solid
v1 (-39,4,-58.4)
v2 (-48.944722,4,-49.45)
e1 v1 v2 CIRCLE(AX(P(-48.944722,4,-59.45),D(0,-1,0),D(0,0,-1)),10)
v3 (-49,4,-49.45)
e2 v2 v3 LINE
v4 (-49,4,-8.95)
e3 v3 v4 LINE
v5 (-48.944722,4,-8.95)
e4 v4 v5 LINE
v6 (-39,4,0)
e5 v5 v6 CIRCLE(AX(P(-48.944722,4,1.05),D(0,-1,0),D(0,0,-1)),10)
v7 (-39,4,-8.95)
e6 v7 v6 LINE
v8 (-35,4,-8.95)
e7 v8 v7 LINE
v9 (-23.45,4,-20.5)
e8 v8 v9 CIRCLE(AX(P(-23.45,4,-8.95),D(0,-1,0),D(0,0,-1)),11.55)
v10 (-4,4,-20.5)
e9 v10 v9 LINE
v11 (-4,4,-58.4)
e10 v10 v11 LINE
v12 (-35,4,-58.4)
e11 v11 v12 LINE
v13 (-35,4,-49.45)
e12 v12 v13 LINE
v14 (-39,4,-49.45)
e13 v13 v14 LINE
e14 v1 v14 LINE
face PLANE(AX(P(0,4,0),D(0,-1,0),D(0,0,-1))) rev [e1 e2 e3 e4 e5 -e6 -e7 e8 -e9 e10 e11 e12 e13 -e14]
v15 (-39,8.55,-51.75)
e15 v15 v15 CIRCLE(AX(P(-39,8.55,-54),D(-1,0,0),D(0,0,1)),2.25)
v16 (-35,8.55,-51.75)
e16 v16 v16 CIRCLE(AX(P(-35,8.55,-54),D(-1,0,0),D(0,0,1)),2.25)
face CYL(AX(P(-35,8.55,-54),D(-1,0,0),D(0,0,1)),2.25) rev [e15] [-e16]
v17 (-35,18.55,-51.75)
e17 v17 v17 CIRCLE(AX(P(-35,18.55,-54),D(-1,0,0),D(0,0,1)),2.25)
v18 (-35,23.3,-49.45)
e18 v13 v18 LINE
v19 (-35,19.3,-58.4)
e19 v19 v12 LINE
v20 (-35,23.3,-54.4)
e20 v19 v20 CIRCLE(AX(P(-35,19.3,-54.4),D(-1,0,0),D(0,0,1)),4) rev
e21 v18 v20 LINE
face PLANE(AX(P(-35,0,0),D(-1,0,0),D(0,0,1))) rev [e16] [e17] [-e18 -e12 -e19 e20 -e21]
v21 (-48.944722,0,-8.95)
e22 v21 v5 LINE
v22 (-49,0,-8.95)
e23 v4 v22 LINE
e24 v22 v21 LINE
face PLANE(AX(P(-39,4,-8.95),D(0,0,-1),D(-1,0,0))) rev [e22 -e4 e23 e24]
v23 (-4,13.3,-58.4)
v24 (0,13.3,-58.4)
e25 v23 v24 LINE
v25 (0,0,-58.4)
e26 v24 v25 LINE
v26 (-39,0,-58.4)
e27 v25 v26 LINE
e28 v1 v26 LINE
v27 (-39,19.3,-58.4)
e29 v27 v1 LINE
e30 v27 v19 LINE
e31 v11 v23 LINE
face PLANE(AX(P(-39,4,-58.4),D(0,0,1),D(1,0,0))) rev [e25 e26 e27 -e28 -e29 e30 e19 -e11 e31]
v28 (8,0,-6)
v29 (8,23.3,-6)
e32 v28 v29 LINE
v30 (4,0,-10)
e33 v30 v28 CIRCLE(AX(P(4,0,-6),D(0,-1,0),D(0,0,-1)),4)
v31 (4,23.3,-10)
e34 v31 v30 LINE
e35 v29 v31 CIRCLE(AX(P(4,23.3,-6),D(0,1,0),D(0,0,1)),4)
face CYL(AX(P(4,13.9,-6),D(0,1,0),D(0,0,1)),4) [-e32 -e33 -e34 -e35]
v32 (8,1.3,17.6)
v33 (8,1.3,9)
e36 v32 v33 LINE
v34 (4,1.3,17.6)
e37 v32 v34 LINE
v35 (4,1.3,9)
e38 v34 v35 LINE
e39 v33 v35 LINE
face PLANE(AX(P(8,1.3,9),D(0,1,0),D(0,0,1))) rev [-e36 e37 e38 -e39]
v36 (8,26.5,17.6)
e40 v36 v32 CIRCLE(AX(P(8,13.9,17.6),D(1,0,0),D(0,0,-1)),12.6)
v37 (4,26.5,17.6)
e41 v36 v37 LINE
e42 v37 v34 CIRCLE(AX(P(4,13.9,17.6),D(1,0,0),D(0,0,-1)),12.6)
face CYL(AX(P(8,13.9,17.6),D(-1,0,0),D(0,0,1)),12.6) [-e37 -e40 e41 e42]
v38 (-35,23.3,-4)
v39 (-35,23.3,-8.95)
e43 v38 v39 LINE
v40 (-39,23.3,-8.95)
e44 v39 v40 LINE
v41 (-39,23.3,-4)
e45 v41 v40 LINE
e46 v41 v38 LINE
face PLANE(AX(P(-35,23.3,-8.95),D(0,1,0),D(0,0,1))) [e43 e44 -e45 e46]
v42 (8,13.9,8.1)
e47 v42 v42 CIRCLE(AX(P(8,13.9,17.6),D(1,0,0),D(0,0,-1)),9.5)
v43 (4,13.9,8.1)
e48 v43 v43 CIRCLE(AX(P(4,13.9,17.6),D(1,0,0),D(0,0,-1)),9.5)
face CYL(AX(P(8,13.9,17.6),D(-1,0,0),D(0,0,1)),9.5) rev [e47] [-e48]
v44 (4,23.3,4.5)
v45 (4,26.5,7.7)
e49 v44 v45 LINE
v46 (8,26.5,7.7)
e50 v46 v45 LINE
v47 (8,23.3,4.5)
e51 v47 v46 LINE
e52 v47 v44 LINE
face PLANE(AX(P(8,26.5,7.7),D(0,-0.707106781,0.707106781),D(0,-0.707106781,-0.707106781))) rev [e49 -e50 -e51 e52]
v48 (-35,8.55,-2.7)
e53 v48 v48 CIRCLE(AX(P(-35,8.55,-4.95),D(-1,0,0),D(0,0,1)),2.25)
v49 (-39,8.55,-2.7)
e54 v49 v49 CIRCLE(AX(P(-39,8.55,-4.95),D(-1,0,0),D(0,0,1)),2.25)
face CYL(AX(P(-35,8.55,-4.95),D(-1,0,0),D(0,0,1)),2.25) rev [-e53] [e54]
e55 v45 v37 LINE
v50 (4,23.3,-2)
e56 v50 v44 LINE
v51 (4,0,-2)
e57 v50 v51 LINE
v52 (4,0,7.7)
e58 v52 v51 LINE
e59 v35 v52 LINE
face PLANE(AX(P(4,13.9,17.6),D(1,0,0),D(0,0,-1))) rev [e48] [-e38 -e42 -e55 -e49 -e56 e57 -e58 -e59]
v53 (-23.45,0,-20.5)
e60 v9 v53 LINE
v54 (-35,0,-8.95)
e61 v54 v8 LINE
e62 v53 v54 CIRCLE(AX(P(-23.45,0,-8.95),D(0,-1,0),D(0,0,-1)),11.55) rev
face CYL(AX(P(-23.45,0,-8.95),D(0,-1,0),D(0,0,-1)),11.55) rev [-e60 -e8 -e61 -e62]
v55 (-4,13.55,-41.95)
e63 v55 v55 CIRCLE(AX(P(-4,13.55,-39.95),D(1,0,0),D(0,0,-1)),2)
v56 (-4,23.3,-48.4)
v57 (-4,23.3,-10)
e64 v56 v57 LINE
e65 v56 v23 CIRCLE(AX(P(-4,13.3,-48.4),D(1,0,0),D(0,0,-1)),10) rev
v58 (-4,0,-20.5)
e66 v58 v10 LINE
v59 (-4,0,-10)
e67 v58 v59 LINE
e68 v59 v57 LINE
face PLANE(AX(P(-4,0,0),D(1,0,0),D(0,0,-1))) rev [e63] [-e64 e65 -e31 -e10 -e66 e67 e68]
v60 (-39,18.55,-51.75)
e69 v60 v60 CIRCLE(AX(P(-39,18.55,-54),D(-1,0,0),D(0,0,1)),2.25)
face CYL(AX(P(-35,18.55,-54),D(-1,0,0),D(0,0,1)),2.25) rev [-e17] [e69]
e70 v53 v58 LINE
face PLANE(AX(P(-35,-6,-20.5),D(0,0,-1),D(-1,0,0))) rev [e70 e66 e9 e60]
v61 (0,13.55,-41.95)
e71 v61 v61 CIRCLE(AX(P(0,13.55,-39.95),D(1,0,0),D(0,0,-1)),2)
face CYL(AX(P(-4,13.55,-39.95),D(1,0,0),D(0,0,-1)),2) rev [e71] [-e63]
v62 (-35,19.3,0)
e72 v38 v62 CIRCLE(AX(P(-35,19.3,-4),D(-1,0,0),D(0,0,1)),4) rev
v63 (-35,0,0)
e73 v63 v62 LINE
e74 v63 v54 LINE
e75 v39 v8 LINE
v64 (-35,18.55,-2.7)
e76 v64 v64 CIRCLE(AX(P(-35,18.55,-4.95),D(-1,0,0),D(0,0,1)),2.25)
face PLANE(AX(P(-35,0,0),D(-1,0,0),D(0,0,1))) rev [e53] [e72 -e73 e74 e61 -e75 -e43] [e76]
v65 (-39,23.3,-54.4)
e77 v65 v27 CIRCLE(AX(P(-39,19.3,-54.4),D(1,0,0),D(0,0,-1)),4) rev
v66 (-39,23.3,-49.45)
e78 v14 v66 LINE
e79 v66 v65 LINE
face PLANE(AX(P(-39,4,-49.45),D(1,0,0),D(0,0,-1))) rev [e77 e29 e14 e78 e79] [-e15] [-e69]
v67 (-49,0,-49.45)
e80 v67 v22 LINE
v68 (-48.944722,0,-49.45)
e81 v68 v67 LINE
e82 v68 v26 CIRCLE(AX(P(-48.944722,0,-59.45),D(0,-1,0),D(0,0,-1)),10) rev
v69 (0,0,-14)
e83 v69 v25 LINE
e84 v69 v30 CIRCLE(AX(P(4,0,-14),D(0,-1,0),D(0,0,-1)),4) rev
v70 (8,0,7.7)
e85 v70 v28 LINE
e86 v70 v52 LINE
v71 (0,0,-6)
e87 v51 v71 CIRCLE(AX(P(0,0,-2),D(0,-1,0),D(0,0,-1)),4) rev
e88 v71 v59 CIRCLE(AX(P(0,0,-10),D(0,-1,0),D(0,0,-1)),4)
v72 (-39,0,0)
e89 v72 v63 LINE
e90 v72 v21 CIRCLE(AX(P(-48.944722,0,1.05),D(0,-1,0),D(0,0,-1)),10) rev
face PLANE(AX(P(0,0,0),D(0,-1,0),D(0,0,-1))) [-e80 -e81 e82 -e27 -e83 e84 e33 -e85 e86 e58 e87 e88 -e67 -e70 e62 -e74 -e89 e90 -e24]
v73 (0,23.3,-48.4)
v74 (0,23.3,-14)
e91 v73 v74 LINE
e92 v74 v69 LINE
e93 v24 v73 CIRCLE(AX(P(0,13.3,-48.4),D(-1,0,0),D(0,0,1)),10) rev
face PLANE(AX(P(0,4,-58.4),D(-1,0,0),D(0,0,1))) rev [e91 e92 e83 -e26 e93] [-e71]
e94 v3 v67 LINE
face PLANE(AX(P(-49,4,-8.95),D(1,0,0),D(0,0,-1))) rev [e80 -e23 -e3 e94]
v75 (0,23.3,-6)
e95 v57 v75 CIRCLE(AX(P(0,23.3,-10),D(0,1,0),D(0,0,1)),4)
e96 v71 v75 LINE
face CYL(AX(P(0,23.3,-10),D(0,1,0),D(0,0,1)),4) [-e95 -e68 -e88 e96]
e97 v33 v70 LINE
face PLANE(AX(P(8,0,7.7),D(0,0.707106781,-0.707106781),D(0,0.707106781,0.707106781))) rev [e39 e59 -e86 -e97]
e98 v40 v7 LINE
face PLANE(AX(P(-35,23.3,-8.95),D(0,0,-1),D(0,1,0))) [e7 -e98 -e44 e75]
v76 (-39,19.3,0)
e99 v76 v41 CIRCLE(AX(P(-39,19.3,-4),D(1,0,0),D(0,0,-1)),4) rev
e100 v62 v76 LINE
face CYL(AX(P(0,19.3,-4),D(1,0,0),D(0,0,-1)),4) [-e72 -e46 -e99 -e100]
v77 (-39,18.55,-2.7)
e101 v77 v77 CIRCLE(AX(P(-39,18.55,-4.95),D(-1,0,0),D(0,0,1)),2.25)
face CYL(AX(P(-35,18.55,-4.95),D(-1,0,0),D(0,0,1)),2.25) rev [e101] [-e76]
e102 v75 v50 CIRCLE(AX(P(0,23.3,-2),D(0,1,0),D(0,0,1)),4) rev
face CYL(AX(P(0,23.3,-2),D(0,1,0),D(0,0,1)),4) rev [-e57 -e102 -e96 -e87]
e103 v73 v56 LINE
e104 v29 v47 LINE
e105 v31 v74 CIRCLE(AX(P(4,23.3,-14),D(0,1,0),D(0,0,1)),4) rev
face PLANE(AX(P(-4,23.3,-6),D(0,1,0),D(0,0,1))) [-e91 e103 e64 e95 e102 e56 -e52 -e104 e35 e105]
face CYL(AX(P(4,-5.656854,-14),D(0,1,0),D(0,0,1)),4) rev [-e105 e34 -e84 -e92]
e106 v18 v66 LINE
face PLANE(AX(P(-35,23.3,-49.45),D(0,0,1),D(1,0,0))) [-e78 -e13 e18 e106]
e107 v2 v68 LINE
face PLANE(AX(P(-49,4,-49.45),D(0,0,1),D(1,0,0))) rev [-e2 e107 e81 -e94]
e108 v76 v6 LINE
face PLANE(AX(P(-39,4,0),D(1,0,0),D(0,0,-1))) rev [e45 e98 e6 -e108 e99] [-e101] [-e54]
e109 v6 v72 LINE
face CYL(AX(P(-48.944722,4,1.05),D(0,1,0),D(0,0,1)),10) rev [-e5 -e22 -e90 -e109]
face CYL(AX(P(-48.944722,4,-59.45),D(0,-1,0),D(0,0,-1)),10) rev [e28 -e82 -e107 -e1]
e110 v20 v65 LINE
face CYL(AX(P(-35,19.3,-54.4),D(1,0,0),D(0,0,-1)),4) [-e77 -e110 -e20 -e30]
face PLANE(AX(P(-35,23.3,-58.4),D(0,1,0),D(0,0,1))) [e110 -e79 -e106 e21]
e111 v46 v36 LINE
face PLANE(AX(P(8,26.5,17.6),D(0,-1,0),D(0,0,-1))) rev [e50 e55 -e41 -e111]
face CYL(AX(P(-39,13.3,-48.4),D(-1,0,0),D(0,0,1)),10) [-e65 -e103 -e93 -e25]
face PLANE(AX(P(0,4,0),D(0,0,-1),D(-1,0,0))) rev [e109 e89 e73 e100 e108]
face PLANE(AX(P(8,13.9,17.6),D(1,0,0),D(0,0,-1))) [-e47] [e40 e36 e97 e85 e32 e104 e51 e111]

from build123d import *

# Parameters (mm, degrees)
BOSS_EXTRUDE1_DEPTH = 4
SKETCH2_W           = 8.95
SKETCH2_H           = 19.3
SKETCH2_R           = 2.25
BOSS_EXTRUDE2_DEPTH = 4
FILLET1_R           = 10
FILLET2_R           = 4
SKETCH3_W           = 52.4
SKETCH3_H           = 19.3
SKETCH3_R           = 2
BOSS_EXTRUDE3_DEPTH = 4
FILLET3_R           = 10
SKETCH4_W           = 31
SKETCH4_H           = 20.5
CUT_EXTRUDE1_DEPTH  = 10
SKETCH5_W           = 4
SKETCH5_H           = 6
CUT_EXTRUDE2_DEPTH  = 10
FILLET4_R           = 11.55
SKETCH6_W           = 4
SKETCH6_H           = 4
BOSS_EXTRUDE4_DEPTH = 23.3
SKETCH7_R           = 9.5
BOSS_EXTRUDE5_DEPTH = 4
FILLET5_R           = 4


# Some blends are built 0.0001 mm under size
with BuildPart() as part:
    # Sketch1 → Boss-Extrude1 (new body)
    with BuildSketch(Plane(origin=(0, 0, 0), x_dir=(1, 0, 0), z_dir=(0, 1, 0))):
        Polygon((-49, 49.45), (-39, 49.45), (-39, 58.4), (0, 58.4), (0, 0), (-39, 0), (-39, 8.95), (-49, 8.95), align=None)
    extrude(amount=BOSS_EXTRUDE1_DEPTH)

    # Sketch2 → Boss-Extrude2 (add)
    # profile 1 of 2: a face of its own
    with BuildSketch(Plane.ZY.offset(39)):
        with Locations((-4.475, 13.65)):
            Rectangle(SKETCH2_W, SKETCH2_H)
        with Locations((-4.95, 18.55)):
            Circle(SKETCH2_R, mode=Mode.SUBTRACT)
        with Locations((-4.95, 8.55)):
            Circle(SKETCH2_R, mode=Mode.SUBTRACT)
    # profile 2 of 2: a face of its own
    with BuildSketch(Plane.ZY.offset(39)):
        with Locations((-53.925, 13.65)):
            Rectangle(SKETCH2_W, SKETCH2_H)
        with Locations((-54, 18.55)):
            Circle(SKETCH2_R, mode=Mode.SUBTRACT)
        with Locations((-54, 8.55)):
            Circle(SKETCH2_R, mode=Mode.SUBTRACT)
    extrude(amount=-BOSS_EXTRUDE2_DEPTH)

    # Fillet1
    # the kernel refuses this fillet: 10 mm, written as the material it adds along each edge
    with BuildSketch(Plane(origin=(-39, 0, -49.45), x_dir=(-1, 0, 0), z_dir=(0, 1, 0))) as fillet1_piece_1:
        with BuildLine():
            CenterArc((9.944722218, -10), FILLET1_R, 90, 83.97283344)
            Line((0, -8.95), (0, 0))
            Line((0, 0), (9.944722218, 0))
        make_face()
    extrude(amount=4)
    with BuildSketch(Plane(origin=(-39, 0, -8.95), x_dir=(0, 0, 1), z_dir=(0, 1, 0))) as fillet1_piece_2:
        with BuildLine():
            CenterArc((10, -9.944722218), FILLET1_R, 96.02716656, 83.97283344)
            Line((0, -9.944722218), (0, 0))
            Line((0, 0), (8.95, 0))
        make_face()
    extrude(amount=4)

    # Fillet2
    fillet2_edges = [part.edges().sort_by_distance(p)[0] for p in [
        (-37, 23.3, 0),
        (-37, 23.3, -58.4),
    ]]
    fillet(fillet2_edges, radius=FILLET2_R)

    # Sketch3 → Boss-Extrude3 (add)
    with BuildSketch(Plane(origin=(0, 0, 0), x_dir=(0, 0, -1), z_dir=(1, 0, 0))):
        with Locations((32.2, 13.65)):
            Rectangle(SKETCH3_W, SKETCH3_H)
        with Locations((39.95, 13.55)):
            Circle(SKETCH3_R, mode=Mode.SUBTRACT)
    extrude(amount=-BOSS_EXTRUDE3_DEPTH)

    # Fillet3
    fillet3_edges = [part.edges().sort_by_distance(p)[0] for p in [
        (-2, 23.3, -58.4),
    ]]
    fillet(fillet3_edges, radius=FILLET3_R)

    # Sketch4 → Cut-Extrude1 (cut)
    with BuildSketch(Plane(origin=(0, 4, 0), x_dir=(1, 0, 0), z_dir=(0, 1, 0))):
        with Locations((-19.5, 10.25)):
            Rectangle(SKETCH4_W, SKETCH4_H)
    extrude(amount=-CUT_EXTRUDE1_DEPTH, mode=Mode.SUBTRACT)

    # Sketch5 → Cut-Extrude2 (cut)
    with BuildSketch(Plane(origin=(0, 4, 0), x_dir=(1, 0, 0), z_dir=(0, 1, 0))):
        with Locations((-2, 3)):
            Rectangle(SKETCH5_W, SKETCH5_H)
    extrude(amount=-CUT_EXTRUDE2_DEPTH, mode=Mode.SUBTRACT)

    # Fillet4
    fillet4_edges = [part.edges().sort_by_distance(p)[0] for p in [
        (-35, 2, -20.5),
    ]]
    fillet(fillet4_edges, radius=FILLET4_R)

    # Sketch6 → Boss-Extrude4 (add)
    with BuildSketch(Plane(origin=(0, 23.3, 0), x_dir=(1, 0, 0), z_dir=(0, 1, 0))):
        with Locations((2, 8)):
            Rectangle(SKETCH6_W, SKETCH6_H)
    extrude(amount=-BOSS_EXTRUDE4_DEPTH)

    # Sketch7 → Boss-Extrude5 (add)
    with BuildSketch(Plane(origin=(4, 0, 0), x_dir=(0, 0, -1), z_dir=(1, 0, 0))):
        with BuildLine():
            Line((-4.5, 23.3), (10, 23.3))
            Line((10, 23.3), (10, 0))
            Line((10, 0), (-7.7, 0))
            Line((-7.7, 0), (-9, 1.3))
            Line((-9, 1.3), (-17.6, 1.3))
            ThreePointArc((-17.6, 1.3), (-30.2, 13.9), (-17.6, 26.5))
            Line((-17.6, 26.5), (-7.7, 26.5))
            Line((-7.7, 26.5), (-4.5, 23.3))
        make_face()
        with Locations((-17.6, 13.9)):
            Circle(SKETCH7_R, mode=Mode.SUBTRACT)
    extrude(amount=BOSS_EXTRUDE5_DEPTH)

    # Fillet5
    fillet5_edges = [part.edges().sort_by_distance(p)[0] for p in [
        (4, 11.65, -6),
        (0, 11.65, -10),
    ]]
    fillet(fillet5_edges, radius=FILLET5_R)
    fillet5_2_edges = [part.edges().sort_by_distance(p)[0] for p in [
        (-4, 11.65, -6),
        (8, 11.65, -10),
    ]]
    fillet(fillet5_2_edges, radius=FILLET5_R - 0.0001)  # a hair under: the kernel refuses the full size


solid = part.part
